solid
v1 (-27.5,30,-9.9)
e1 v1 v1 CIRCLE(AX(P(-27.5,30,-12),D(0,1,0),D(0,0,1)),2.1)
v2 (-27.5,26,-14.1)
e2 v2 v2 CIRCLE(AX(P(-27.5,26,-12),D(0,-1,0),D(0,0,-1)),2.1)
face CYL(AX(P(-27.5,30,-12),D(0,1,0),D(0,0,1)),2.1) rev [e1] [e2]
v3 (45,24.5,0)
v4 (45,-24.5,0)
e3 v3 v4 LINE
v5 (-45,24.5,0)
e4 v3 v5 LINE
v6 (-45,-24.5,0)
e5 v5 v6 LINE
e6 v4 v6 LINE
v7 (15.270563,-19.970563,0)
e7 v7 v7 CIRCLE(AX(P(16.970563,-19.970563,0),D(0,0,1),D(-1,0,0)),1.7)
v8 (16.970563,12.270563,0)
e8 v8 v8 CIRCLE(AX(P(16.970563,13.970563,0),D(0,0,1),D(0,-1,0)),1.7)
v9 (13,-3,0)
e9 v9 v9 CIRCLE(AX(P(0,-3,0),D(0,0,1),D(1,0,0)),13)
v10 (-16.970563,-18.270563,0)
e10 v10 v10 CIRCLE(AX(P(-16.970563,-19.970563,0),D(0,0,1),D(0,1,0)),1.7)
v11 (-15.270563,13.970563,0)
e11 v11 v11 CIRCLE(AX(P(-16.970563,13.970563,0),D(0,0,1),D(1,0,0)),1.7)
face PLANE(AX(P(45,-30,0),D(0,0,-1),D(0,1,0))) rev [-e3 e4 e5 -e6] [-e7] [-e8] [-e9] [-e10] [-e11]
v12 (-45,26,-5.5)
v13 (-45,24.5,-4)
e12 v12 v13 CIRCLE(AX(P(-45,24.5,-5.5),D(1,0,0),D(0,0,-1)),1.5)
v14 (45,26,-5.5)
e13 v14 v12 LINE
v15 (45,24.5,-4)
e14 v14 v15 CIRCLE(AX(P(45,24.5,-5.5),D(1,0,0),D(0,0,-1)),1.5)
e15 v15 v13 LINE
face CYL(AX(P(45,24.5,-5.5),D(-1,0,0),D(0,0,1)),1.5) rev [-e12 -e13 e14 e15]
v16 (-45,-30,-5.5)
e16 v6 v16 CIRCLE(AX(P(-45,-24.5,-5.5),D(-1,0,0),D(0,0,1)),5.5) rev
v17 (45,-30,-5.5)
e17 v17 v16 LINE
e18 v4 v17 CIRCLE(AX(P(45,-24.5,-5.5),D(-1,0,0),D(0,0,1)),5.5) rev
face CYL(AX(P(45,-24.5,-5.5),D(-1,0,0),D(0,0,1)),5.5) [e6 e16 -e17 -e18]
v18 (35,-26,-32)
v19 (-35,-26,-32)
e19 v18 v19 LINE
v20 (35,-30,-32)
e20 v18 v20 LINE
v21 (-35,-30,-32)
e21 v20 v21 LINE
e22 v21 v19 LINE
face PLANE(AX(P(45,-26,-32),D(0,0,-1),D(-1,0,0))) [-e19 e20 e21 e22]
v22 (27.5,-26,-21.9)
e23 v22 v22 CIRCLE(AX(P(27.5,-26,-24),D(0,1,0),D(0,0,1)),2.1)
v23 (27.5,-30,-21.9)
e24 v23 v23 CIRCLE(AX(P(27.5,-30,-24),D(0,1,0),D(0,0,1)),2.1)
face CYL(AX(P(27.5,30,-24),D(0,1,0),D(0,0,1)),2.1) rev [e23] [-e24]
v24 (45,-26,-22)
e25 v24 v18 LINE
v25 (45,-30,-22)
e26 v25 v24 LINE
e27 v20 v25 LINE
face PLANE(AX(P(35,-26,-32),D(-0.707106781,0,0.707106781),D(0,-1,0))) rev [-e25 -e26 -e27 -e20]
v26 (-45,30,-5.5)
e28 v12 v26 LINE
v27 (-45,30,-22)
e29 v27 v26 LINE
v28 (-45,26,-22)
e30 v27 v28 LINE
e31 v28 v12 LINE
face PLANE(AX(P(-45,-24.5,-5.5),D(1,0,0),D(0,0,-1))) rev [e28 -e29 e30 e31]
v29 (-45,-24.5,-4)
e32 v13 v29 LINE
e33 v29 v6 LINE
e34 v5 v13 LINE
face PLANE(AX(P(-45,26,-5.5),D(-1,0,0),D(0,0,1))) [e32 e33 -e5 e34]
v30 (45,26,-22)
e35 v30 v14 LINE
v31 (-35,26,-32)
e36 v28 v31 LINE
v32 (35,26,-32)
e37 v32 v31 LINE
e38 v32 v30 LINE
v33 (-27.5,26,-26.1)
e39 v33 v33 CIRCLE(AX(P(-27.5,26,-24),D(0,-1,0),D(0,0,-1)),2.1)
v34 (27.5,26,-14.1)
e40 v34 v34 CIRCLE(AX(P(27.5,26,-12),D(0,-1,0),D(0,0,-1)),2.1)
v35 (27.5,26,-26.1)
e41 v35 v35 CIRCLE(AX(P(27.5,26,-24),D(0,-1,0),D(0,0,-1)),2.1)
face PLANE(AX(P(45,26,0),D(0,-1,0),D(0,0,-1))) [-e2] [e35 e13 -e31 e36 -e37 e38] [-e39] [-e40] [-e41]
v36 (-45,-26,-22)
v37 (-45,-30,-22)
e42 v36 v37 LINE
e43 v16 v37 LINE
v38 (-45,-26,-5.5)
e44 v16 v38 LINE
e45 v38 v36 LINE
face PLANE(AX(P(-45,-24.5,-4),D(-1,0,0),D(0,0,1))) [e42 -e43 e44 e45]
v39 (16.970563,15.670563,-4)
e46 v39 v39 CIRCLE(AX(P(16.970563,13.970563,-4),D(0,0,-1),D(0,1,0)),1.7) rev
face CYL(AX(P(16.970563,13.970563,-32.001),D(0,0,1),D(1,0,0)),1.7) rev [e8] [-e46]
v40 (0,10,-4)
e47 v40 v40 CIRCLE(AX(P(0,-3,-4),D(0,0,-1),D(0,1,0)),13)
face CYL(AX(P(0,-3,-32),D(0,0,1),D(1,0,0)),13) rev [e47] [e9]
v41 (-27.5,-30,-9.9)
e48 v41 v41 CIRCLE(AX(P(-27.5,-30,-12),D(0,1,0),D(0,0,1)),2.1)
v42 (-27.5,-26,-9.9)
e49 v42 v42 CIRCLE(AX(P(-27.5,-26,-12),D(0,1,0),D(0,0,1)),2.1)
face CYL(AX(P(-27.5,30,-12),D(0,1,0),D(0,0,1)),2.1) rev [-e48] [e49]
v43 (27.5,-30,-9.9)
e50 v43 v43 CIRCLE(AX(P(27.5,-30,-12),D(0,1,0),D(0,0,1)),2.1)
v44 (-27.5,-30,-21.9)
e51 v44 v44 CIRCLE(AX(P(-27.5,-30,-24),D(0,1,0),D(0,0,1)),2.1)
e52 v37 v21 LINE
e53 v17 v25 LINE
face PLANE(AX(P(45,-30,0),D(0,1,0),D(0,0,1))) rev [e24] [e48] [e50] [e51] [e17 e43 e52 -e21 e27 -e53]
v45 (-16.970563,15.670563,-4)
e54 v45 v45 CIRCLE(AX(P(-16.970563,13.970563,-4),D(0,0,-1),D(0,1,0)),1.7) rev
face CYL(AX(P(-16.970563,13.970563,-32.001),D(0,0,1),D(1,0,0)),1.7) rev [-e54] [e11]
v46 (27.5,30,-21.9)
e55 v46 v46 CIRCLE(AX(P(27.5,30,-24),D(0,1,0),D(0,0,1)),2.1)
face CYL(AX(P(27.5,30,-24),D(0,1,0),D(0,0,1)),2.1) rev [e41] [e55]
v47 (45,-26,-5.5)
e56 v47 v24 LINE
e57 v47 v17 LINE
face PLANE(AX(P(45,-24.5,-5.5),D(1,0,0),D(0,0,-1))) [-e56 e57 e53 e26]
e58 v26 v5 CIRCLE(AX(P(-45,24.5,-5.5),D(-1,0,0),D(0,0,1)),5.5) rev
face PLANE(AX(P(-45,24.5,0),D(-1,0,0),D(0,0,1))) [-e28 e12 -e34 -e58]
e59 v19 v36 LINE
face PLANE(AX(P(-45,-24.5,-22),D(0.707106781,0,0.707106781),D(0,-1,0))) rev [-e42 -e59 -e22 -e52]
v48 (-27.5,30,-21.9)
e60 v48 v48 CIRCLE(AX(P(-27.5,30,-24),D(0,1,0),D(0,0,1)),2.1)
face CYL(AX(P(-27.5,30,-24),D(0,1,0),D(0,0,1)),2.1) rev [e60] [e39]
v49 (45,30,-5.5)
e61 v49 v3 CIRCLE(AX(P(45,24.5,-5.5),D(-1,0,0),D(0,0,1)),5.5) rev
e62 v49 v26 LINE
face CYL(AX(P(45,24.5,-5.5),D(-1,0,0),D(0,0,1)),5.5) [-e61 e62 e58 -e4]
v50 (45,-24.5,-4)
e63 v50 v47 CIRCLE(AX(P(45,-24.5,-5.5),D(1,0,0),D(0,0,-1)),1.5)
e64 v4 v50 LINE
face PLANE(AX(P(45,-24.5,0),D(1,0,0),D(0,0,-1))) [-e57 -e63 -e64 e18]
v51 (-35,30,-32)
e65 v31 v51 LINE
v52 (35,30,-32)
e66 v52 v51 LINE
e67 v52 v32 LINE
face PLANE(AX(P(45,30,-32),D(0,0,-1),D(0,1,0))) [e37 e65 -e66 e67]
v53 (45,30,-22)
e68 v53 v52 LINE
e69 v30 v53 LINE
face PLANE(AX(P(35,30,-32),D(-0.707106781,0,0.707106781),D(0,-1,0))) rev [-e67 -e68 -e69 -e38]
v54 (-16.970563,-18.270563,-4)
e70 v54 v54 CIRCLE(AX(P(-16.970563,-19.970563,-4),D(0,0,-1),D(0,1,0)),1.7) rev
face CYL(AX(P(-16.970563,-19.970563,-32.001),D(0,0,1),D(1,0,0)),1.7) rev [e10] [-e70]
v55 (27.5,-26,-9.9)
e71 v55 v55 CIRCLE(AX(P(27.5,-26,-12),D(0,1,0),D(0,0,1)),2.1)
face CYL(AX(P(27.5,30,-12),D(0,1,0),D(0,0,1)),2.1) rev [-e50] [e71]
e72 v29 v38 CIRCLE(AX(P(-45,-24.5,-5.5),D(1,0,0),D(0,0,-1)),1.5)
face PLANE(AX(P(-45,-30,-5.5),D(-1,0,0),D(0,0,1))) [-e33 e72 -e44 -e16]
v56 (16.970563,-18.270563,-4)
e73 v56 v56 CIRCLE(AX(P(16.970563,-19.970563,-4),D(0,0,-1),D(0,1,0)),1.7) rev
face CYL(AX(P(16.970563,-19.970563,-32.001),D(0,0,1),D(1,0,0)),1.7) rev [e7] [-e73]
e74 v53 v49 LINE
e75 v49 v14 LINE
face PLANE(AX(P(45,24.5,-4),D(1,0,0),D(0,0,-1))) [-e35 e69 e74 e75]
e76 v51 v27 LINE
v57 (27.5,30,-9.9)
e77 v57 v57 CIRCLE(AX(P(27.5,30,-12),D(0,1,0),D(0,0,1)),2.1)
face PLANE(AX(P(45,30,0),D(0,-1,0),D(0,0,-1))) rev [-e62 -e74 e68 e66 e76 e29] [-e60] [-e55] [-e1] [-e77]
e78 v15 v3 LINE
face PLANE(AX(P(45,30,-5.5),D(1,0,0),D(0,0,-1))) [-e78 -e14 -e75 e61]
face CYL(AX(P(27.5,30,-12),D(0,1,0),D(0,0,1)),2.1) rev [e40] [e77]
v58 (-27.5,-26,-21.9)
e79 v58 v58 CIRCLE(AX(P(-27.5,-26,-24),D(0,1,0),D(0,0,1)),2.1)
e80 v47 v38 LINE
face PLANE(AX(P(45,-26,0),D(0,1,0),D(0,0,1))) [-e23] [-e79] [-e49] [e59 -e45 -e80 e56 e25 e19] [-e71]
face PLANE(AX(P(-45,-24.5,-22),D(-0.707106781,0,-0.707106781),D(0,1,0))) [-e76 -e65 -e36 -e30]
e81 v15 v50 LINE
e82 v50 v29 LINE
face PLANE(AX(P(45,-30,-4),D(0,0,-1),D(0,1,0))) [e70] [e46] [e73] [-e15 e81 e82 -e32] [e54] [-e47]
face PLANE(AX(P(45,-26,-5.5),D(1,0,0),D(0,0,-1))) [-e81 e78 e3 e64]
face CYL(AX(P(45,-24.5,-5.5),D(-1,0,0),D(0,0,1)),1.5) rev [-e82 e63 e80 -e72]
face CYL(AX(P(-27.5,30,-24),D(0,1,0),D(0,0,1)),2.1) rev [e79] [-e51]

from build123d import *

# Parameters (mm, degrees)
SM_BASE_FLANGE_1_DEPTH   = 45
SKETCH_7_R               = 13
CUT_EXTRUDE_1_DEPTH      = 63.841069373
CHAMFER_1_SIZE           = 10
SKETCH_9_R               = 1
CUT_EXTRUDE_3_DEPTH      = 82.541400528
M5X0_8_1_D               = 4.2
CUT_EXTRUDE_4_REACH      = 64.841
SKETCH_11_R              = 1.7
PATTERN_CIRCULAR_1_COUNT = 4


# Sheet-metal steps are written as plain solids
with BuildPart() as part:
    # Sketch 2 → 基材-凸緣1 (new, symmetric)
    with BuildSketch(Plane(origin=(0, 0, 0), x_dir=(0, 0, -1), z_dir=(1, 0, 0))):
        with BuildLine():
            Line((32, -30), (5.5, -30))
            ThreePointArc((5.5, -30), (1.610912703, -28.389087297), (0, -24.5))
            Line((0, -24.5), (0, 24.5))
            ThreePointArc((0, 24.5), (1.610912703, 28.389087297), (5.5, 30))
            Line((5.5, 30), (32, 30))
            Line((32, 30), (32, 26))
            Line((32, 26), (5.5, 26))
            ThreePointArc((5.5, 26), (4.439339828, 25.560660172), (4, 24.5))
            Line((4, 24.5), (4, -24.5))
            ThreePointArc((4, -24.5), (4.439339828, -25.560660172), (5.5, -26))
            Line((5.5, -26), (32, -26))
            Line((32, -26), (32, -30))
        make_face()
    extrude(amount=SM_BASE_FLANGE_1_DEPTH, both=True)

    # 草圖7 → 除料-伸長1 (cut, through all)
    with BuildSketch(Plane.XY):
        with Locations((0, -3)):
            Circle(SKETCH_7_R)
    extrude(amount=-CUT_EXTRUDE_1_DEPTH, mode=Mode.SUBTRACT)

    # 導角1
    chamfer_1_edges = [part.edges().sort_by_distance(p)[0] for p in [
        (-45, 28, -32),
        (-45, -28, -32),
        (45, 28, -32),
        (45, -28, -32),
    ]]
    chamfer(chamfer_1_edges, length=CHAMFER_1_SIZE)

    # 草圖9 → 除料-伸長3 (cut, through all)
    with BuildSketch(Plane(origin=(0, 30, 0), x_dir=(1, 0, 0), z_dir=(0, 1, 0))):
        with Locations(Location((-27.5, 24, 0), (0, 0, 270))):
            Circle(SKETCH_9_R)
        with Locations(Location((27.5, 24, 0), (0, 0, 270))):
            Circle(SKETCH_9_R)
        with Locations(Location((-27.5, 12, 0), (0, 0, 270))):
            Circle(SKETCH_9_R)
        with Locations(Location((27.5, 12, 0), (0, 0, 270))):
            Circle(SKETCH_9_R)
    extrude(amount=-CUT_EXTRUDE_3_DEPTH, mode=Mode.SUBTRACT)

    # M5x0.8 螺紋孔1 (through all)
    with Locations(Plane(origin=(-27.5, 30, -24), x_dir=(0, 0, 1), z_dir=(0, 1, 0))):
        with Locations((0, 0), (12, 0), (12, 55), (0, 55)):
            Hole(M5X0_8_1_D / 2)

    # 草圖11 → 除料-伸長4 (cut, up to next)
    with BuildSketch(Plane.XY, mode=Mode.PRIVATE) as cut_extrude_4_sk1:
        with Locations((-16.970562748, 13.970562748)):
            Circle(SKETCH_11_R)
    cut_extrude_4_tool1 = extrude(cut_extrude_4_sk1.sketch, amount=-CUT_EXTRUDE_4_REACH, mode=Mode.PRIVATE) & part.part
    cut_extrude_4 = cut_extrude_4_tool1.solids().sort_by_distance((-16.970563, 13.970563, 0))[0]
    add(cut_extrude_4, mode=Mode.SUBTRACT)

    # 環狀複製排列1: 除料-伸長4 ×4 about axis
    pattern_circular_1_axis = Axis((0, -3, 0), (0, 0, 1))
    for i in range(1, PATTERN_CIRCULAR_1_COUNT):
        add(cut_extrude_4.rotate(pattern_circular_1_axis, i * 360 / PATTERN_CIRCULAR_1_COUNT), mode=Mode.SUBTRACT)


solid = part.part
